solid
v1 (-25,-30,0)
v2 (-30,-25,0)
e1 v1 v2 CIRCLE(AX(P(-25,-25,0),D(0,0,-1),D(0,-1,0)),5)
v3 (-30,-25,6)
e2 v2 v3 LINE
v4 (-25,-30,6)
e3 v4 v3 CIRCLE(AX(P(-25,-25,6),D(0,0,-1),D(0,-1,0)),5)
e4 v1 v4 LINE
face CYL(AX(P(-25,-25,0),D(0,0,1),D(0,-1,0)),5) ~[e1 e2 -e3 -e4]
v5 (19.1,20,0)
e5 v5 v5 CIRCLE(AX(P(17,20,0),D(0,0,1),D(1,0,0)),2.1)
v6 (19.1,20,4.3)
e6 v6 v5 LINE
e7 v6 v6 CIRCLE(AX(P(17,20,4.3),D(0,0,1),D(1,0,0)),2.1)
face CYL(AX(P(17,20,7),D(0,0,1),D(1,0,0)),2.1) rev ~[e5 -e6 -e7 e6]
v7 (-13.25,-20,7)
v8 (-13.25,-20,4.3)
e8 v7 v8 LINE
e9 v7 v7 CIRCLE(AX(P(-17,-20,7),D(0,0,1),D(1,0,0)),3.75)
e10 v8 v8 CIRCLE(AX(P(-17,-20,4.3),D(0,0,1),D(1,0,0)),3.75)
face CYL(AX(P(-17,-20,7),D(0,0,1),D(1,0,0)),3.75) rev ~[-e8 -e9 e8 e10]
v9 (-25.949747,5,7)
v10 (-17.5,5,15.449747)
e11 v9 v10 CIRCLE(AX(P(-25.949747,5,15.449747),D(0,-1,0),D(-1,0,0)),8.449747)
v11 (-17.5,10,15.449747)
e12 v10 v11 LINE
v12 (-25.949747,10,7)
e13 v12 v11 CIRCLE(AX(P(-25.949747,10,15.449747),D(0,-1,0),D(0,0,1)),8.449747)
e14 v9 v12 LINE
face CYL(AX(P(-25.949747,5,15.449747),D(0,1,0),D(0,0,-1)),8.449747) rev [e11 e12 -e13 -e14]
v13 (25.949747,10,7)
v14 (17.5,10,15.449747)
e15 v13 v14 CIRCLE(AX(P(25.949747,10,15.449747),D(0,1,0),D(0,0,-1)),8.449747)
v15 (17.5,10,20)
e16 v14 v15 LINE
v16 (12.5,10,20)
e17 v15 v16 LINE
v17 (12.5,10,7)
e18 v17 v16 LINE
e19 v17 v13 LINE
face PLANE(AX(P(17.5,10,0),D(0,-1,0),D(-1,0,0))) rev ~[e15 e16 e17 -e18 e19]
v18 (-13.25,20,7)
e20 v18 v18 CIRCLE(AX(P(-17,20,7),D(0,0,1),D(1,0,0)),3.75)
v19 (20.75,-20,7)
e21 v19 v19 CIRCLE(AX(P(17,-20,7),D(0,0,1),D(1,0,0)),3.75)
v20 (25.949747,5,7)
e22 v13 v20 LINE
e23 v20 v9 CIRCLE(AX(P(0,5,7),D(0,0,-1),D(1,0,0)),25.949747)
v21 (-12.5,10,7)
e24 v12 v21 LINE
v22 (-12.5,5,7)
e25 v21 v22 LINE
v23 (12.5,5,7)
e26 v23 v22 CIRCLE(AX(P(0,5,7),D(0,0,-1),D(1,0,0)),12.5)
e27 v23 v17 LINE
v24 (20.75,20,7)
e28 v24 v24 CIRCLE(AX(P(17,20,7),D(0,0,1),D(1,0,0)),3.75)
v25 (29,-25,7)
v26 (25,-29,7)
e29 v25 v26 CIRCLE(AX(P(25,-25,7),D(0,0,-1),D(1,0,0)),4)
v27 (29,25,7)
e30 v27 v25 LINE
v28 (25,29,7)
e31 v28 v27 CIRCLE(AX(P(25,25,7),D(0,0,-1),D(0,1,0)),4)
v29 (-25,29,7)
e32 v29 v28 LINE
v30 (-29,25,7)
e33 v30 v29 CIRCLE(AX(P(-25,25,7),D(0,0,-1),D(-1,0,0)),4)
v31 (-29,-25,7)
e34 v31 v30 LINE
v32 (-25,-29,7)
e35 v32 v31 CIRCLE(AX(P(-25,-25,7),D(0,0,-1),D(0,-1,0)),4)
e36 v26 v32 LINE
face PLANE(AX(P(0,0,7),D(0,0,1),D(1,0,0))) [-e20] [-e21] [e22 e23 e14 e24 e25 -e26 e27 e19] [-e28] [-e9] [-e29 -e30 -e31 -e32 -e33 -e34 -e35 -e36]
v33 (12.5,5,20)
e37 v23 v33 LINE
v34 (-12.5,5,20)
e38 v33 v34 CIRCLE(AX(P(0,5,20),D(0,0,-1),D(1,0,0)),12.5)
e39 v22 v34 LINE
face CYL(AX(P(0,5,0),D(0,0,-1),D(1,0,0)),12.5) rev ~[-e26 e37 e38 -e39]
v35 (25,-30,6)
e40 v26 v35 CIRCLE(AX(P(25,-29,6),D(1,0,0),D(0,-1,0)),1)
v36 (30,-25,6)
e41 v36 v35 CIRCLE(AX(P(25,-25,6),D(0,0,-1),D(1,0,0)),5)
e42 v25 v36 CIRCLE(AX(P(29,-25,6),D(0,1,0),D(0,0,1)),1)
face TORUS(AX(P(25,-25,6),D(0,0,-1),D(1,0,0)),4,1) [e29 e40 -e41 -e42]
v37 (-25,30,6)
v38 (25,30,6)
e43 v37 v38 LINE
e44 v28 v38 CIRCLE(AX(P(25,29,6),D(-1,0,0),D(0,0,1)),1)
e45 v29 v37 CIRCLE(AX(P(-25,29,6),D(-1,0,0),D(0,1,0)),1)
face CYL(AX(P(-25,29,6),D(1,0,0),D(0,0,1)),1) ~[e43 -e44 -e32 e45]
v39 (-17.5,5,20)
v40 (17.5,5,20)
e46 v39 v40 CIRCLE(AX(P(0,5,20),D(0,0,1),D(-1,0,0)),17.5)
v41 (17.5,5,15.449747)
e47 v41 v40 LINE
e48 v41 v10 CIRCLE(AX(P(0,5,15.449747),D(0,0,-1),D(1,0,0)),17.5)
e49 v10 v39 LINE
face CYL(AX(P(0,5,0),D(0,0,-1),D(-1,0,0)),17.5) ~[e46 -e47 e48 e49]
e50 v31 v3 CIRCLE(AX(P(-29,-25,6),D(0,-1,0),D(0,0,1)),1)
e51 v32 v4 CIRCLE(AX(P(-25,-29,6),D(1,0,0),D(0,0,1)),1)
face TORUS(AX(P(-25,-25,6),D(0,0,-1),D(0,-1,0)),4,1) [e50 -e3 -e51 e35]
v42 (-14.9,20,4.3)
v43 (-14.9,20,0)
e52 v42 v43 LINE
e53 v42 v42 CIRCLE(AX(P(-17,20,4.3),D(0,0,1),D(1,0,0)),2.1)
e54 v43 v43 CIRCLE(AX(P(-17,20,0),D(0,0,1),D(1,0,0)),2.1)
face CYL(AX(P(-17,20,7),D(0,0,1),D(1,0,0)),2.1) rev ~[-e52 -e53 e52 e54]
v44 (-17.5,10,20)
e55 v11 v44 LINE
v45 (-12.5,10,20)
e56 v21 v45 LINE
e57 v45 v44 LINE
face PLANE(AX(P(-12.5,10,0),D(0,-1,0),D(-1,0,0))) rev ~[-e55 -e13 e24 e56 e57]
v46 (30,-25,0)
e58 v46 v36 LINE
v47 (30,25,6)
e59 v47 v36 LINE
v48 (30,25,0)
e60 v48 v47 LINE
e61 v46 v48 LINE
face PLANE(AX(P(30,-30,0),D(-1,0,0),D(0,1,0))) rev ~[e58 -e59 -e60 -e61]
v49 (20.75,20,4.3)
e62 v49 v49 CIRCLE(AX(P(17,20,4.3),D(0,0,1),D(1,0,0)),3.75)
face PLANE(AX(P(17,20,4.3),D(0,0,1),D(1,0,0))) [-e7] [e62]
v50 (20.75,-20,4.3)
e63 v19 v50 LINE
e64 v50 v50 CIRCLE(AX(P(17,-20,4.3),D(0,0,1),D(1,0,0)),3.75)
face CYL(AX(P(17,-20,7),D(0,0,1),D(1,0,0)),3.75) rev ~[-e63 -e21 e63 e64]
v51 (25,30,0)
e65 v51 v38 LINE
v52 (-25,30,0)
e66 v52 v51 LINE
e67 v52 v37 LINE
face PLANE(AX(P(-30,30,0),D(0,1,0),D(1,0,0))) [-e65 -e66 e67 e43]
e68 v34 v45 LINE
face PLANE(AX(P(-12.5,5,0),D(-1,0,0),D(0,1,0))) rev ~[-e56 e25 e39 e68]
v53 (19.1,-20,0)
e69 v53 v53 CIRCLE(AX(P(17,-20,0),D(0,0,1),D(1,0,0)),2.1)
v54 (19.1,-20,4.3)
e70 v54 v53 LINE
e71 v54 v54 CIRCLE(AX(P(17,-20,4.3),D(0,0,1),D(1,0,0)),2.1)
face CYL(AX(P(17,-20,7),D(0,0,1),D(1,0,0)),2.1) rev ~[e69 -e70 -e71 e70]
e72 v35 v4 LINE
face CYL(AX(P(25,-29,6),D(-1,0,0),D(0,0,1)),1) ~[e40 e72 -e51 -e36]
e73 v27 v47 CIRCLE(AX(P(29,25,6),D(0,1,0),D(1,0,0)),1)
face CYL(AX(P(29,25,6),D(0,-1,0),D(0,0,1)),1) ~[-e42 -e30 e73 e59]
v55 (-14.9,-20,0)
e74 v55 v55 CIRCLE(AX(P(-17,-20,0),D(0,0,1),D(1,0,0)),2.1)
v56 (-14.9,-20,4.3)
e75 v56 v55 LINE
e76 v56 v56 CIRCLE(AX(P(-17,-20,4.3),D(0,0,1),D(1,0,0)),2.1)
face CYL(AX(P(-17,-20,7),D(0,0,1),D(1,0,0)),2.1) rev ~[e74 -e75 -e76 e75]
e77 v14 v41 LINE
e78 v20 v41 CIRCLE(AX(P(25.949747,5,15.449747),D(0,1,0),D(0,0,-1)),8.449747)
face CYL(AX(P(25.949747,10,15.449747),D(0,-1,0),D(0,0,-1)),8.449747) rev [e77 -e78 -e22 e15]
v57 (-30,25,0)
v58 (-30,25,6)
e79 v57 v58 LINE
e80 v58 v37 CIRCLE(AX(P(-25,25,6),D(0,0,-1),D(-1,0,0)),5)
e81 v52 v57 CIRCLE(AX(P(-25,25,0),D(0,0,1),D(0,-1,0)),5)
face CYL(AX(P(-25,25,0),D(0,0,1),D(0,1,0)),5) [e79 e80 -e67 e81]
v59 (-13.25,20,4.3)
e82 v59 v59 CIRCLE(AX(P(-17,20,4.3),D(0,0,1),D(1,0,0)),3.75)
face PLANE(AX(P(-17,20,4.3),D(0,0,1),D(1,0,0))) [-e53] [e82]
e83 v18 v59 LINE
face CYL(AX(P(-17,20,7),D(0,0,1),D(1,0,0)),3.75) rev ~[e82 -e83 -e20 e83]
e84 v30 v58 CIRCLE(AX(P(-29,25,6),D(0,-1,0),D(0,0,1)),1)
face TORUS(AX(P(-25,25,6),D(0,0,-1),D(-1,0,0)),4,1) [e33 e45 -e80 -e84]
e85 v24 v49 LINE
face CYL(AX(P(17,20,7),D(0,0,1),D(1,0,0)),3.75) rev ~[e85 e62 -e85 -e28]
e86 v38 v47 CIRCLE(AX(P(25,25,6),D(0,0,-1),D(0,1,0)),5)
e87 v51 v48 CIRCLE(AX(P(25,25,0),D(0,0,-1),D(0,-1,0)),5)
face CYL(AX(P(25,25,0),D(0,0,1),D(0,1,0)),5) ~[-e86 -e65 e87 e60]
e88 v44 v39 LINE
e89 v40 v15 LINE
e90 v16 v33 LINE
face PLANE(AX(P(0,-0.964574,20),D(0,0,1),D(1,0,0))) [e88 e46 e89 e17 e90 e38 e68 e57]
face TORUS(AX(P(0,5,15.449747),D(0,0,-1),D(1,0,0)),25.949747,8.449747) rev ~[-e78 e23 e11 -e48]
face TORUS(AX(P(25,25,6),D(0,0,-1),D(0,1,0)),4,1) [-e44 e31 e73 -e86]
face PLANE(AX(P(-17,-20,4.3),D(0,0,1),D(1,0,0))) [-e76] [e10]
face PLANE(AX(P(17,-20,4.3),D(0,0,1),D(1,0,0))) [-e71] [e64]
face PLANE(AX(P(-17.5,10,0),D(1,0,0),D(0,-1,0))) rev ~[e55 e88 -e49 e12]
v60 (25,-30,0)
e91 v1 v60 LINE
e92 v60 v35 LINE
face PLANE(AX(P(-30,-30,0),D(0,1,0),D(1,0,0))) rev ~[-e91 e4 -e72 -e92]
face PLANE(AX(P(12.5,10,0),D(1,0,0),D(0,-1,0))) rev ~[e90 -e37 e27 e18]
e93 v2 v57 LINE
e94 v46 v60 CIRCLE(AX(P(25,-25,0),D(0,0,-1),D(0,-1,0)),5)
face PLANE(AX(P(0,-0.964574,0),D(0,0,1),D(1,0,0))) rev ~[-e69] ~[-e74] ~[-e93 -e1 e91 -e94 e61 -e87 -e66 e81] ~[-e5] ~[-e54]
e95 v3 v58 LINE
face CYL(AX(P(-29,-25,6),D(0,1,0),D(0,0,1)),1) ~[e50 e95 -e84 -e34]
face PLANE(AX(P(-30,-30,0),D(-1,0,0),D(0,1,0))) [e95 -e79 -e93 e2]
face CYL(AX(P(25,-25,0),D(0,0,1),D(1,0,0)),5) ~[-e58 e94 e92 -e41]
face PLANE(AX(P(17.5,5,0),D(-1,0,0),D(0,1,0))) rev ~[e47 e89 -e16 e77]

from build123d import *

# Parameters (mm, degrees)
F0_W     = 60
F0_H     = 60
F1_DEPTH = 7
F2_DEPTH = 20
F3_R     = 8.4497474683
F4_R     = 5
F5_R     = 1
F6_R     = 2.1
F7_DEPTH = 25
F6_R_2   = 3.75
F8_DEPTH = 2.7


# Not quite as in the source:
# - a feature names something its author has since deleted; it is built from what else it names


with BuildPart() as f1:
    # F0 (on Top) → F1 (new body)
    with BuildSketch(Plane.XY):
        Rectangle(F0_W, F0_H)
        with BuildLine():
            ThreePointArc((-16.7705098312, 10), (0, 22.5), (16.7705098312, 10))
            Line((16.7705098312, 10), (17.5, 10))
            Line((17.5, 10), (17.5, 5))
            ThreePointArc((17.5, 5), (0, -12.5), (-17.5, 5))
            Line((-17.5, 5), (-17.5, 10))
            Line((-17.5, 10), (-16.7705098312, 10))
        make_face(mode=Mode.SUBTRACT)
        with BuildLine():
            ThreePointArc((-12.5, 5), (0, -7.5), (12.5, 5))
            ThreePointArc((12.5, 5), (0, 17.5), (-12.5, 5))
        make_face()
        with BuildLine():
            ThreePointArc((-12.5, 5), (0, 17.5), (12.5, 5))
            Line((12.5, 5), (12.5, 10))
            Line((12.5, 10), (16.7705098312, 10))
            ThreePointArc((16.7705098312, 10), (0, 22.5), (-16.7705098312, 10))
            Line((-16.7705098312, 10), (-12.5, 10))
            Line((-12.5, 10), (-12.5, 5))
        make_face()
        with BuildLine():
            Line((12.5, 10), (12.5, 5))
            ThreePointArc((12.5, 5), (0, -7.5), (-12.5, 5))
            Line((-12.5, 5), (-12.5, 10))
            Line((-12.5, 10), (-16.7705098312, 10))
            ThreePointArc((-16.7705098312, 10), (-17.3166671454, 7.5264676876), (-17.5, 5))
            ThreePointArc((-17.5, 5), (0, -12.5), (17.5, 5))
            ThreePointArc((17.5, 5), (17.3166671454, 7.5264676876), (16.7705098312, 10))
            Line((16.7705098312, 10), (12.5, 10))
        make_face()
        with BuildLine():
            ThreePointArc((-17.5, 5), (-17.3166671454, 7.5264676876), (-16.7705098312, 10))
            Line((-16.7705098312, 10), (-17.5, 10))
            Line((-17.5, 10), (-17.5, 5))
        make_face()
        with BuildLine():
            Line((17.5, 10), (16.7705098312, 10))
            ThreePointArc((16.7705098312, 10), (17.3166671454, 7.5264676876), (17.5, 5))
            Line((17.5, 5), (17.5, 10))
        make_face()
    extrude(amount=F1_DEPTH)

    # F0 (on Top) → F2 (join)
    with BuildSketch(Plane.XY):
        with BuildLine():
            Line((12.5, 10), (12.5, 5))
            ThreePointArc((12.5, 5), (0, -7.5), (-12.5, 5))
            Line((-12.5, 5), (-12.5, 10))
            Line((-12.5, 10), (-16.7705098312, 10))
            ThreePointArc((-16.7705098312, 10), (-17.3166671454, 7.5264676876), (-17.5, 5))
            ThreePointArc((-17.5, 5), (0, -12.5), (17.5, 5))
            ThreePointArc((17.5, 5), (17.3166671454, 7.5264676876), (16.7705098312, 10))
            Line((16.7705098312, 10), (12.5, 10))
        make_face()
        with BuildLine():
            Line((17.5, 10), (16.7705098312, 10))
            ThreePointArc((16.7705098312, 10), (17.3166671454, 7.5264676876), (17.5, 5))
            Line((17.5, 5), (17.5, 10))
        make_face()
        with BuildLine():
            ThreePointArc((-17.5, 5), (-17.3166671454, 7.5264676876), (-16.7705098312, 10))
            Line((-16.7705098312, 10), (-17.5, 10))
            Line((-17.5, 10), (-17.5, 5))
        make_face()
    extrude(amount=F2_DEPTH)

    # F3
    f3_edges = [f1.edges().sort_by_distance(p)[0] for p in [
        (0, -12.5, 7),
        (-17.5, 7.5, 7),
        (17.5, 7.5, 7),
    ]]
    fillet(f3_edges, radius=F3_R)

    # F4
    f4_edges = [f1.edges().sort_by_distance(p)[0] for p in [
        (30, -30, 3.5),
        (-30, -30, 3.5),
        (-30, 30, 3.5),
        (30, 30, 3.5),
    ]]
    fillet(f4_edges, radius=F4_R)

    # F5
    f5_edges = [f1.edges().sort_by_distance(p)[0] for p in [
        (-30, 0, 7),
        (-28.535534, 28.535534, 7),
        (0, 30, 7),
        (30, 0, 7),
        (28.535534, 28.535534, 7),
        (0, -30, 7),
        (-28.535534, -28.535534, 7),
        (28.535534, -28.535534, 7),
    ]]
    fillet(f5_edges, radius=F5_R)

    # F6 (on face) → F7 (cut)
    with BuildSketch(Plane.XY.offset(7)):
        with Locations((-17, 20)):
            Circle(F6_R)
        with Locations((17, 20)):
            Circle(F6_R)
        with Locations((-17, -20)):
            Circle(F6_R)
        with Locations((17, -20)):
            Circle(F6_R)
    extrude(amount=-F7_DEPTH, mode=Mode.SUBTRACT)

    # F6 (on face) → F8 (cut)
    with BuildSketch(Plane.XY.offset(7)):
        with Locations((-17, 20)):
            Circle(F6_R_2)
        with Locations((-17, 20)):
            Circle(F6_R, mode=Mode.SUBTRACT)
        with Locations((17, 20)):
            Circle(F6_R_2)
        with Locations((17, 20)):
            Circle(F6_R, mode=Mode.SUBTRACT)
        with Locations((-17, -20)):
            Circle(F6_R_2)
        with Locations((-17, -20)):
            Circle(F6_R, mode=Mode.SUBTRACT)
        with Locations((17, -20)):
            Circle(F6_R_2)
        with Locations((17, -20)):
            Circle(F6_R, mode=Mode.SUBTRACT)
    extrude(amount=-F8_DEPTH, mode=Mode.SUBTRACT)


solid = f1.part
